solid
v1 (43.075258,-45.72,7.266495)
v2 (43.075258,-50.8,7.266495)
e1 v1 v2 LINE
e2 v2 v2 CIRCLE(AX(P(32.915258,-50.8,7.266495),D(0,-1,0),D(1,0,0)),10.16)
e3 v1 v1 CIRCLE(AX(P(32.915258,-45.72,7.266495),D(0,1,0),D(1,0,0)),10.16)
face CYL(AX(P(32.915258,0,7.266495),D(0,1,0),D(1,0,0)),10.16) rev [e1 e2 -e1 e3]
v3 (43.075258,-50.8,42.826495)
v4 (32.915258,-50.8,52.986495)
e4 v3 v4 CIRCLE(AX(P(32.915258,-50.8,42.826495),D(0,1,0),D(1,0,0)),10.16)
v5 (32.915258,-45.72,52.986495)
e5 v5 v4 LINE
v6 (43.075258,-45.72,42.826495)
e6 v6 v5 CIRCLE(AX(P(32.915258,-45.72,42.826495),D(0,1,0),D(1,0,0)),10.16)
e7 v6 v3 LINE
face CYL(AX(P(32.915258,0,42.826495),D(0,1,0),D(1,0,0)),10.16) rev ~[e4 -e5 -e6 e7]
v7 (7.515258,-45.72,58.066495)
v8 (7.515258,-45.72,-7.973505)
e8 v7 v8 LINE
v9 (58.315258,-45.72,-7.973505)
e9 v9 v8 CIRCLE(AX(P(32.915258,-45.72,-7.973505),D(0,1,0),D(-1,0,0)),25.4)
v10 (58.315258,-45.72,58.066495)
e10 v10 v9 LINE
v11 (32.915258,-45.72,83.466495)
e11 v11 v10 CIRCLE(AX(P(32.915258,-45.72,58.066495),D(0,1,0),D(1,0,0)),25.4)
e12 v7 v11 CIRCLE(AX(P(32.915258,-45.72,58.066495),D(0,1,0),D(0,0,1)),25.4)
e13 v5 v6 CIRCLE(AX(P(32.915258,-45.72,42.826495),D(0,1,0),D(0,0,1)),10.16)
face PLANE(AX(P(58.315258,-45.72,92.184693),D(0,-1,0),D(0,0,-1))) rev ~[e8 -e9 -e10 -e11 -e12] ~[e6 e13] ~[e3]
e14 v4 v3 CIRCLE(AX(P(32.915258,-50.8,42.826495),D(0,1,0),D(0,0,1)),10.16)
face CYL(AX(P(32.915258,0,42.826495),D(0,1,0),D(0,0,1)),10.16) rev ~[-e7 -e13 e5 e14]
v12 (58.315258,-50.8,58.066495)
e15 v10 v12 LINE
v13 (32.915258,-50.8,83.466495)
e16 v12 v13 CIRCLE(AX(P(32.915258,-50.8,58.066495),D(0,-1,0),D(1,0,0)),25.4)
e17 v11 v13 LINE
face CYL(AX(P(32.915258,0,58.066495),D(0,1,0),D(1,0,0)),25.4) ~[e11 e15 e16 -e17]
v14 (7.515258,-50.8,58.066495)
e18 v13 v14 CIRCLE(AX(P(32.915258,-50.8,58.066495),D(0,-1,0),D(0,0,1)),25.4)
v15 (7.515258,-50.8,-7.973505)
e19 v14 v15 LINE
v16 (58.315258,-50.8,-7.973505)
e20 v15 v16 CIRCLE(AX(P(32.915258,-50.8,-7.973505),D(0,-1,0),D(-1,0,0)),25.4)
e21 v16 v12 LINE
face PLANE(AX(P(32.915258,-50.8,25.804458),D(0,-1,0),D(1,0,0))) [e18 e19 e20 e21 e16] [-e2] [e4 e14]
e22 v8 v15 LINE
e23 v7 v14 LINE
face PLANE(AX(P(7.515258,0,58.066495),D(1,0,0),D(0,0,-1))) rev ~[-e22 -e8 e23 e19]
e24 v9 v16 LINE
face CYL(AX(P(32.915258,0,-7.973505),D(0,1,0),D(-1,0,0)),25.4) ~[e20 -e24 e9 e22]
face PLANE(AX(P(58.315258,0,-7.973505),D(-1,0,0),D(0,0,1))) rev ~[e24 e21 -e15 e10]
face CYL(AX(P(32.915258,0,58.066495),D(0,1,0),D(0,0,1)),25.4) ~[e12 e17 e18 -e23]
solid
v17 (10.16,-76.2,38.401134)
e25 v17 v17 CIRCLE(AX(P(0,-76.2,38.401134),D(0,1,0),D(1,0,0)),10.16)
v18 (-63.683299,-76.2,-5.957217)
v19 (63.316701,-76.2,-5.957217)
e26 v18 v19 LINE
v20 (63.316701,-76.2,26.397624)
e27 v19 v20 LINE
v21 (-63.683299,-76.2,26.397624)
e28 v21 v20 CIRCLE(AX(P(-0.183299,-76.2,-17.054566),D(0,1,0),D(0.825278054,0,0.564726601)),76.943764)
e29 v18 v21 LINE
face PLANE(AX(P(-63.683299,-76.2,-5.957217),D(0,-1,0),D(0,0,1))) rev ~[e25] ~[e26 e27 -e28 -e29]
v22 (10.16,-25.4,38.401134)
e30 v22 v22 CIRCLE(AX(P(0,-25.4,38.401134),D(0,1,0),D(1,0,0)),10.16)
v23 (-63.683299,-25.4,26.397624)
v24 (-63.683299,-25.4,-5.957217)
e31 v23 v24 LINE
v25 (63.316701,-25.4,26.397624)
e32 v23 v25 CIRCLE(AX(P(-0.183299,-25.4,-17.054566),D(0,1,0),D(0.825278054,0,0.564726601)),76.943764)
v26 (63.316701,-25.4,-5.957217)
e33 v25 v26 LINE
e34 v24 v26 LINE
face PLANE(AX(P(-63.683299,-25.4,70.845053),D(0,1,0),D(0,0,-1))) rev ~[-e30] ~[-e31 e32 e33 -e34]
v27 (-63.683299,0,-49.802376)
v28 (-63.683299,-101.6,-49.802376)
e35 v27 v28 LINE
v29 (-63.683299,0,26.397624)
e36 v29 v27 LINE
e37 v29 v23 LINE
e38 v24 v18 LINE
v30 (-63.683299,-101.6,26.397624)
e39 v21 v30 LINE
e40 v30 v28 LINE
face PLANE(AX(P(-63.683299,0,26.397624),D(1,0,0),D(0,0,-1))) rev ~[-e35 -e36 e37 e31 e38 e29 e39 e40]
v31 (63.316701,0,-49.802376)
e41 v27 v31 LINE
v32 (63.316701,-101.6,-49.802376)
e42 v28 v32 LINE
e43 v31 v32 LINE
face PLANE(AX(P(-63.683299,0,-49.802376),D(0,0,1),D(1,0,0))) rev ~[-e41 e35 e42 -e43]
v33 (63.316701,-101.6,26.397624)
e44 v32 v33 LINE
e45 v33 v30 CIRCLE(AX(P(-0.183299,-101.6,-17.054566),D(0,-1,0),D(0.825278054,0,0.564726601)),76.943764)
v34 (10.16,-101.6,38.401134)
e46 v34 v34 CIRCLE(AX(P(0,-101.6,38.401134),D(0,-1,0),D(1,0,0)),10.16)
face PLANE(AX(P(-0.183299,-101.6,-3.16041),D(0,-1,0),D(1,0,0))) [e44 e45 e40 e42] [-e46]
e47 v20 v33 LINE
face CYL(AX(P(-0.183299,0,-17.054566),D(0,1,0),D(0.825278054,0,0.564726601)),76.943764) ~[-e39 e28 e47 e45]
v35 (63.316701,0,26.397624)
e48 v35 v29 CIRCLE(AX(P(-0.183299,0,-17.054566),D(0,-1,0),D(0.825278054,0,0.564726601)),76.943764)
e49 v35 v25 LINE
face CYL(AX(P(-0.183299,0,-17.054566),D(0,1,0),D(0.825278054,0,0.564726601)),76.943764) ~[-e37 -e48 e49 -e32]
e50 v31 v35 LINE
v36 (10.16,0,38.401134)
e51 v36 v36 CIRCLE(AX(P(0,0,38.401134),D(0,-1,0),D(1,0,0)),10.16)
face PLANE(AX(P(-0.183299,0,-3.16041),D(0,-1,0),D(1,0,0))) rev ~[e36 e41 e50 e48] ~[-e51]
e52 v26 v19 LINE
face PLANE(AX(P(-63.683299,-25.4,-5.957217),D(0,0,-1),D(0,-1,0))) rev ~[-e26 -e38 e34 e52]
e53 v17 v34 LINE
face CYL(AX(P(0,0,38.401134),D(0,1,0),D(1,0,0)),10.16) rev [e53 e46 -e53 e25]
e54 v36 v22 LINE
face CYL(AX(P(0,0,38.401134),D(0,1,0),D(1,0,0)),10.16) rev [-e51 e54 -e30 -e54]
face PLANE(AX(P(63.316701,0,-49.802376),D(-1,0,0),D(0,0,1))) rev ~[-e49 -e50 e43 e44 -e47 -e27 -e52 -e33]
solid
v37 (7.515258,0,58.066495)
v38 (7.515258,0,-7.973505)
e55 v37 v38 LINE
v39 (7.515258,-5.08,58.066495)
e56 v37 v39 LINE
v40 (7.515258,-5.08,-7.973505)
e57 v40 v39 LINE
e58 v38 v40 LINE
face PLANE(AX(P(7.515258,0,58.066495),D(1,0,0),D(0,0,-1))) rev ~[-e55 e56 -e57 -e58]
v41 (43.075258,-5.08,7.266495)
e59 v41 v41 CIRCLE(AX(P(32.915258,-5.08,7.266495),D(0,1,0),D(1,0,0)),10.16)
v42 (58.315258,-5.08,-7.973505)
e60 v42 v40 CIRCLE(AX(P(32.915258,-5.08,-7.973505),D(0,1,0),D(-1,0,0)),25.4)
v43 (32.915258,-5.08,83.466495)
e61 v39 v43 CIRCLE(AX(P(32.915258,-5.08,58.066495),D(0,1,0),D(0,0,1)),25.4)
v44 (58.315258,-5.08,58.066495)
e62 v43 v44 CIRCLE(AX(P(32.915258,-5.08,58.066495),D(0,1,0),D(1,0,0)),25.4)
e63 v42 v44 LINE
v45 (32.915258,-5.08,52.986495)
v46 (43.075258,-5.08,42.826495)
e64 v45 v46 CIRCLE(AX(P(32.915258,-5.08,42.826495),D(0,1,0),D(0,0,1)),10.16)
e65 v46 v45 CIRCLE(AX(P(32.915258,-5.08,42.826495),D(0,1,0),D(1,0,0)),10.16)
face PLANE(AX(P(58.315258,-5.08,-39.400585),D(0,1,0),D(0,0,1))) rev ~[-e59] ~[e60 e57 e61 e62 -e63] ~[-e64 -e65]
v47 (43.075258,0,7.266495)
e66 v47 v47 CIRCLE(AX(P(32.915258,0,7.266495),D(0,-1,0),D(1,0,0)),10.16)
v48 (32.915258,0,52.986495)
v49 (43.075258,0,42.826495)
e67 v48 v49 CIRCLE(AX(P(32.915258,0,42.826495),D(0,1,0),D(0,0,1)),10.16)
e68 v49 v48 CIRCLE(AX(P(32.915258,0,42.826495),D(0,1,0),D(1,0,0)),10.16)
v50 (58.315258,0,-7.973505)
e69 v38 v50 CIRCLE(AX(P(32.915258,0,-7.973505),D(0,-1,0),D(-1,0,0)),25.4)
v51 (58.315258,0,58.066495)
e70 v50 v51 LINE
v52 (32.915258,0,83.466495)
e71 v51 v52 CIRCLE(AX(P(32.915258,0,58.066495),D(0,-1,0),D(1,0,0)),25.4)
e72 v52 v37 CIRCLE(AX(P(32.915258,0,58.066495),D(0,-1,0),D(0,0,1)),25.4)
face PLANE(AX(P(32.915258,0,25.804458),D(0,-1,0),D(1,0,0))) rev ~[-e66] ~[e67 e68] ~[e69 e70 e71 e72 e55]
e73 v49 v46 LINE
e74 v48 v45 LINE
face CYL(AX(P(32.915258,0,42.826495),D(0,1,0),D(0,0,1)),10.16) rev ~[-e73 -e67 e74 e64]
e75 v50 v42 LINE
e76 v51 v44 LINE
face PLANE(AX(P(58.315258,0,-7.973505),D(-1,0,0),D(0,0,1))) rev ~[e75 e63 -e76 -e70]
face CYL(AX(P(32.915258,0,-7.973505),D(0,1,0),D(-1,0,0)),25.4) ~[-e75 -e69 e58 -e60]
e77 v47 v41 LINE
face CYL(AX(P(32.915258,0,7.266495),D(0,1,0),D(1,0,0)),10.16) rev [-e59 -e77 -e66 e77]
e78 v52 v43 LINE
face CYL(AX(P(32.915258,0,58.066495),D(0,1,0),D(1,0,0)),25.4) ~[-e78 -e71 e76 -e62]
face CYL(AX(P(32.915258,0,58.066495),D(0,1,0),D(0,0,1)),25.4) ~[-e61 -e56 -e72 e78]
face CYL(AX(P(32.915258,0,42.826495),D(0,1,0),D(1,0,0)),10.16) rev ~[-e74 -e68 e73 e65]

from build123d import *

# Parameters (mm, degrees)
F0_R     = 10.16
F1_DEPTH = 101.6
F2_W     = 50.8
F2_H     = 32.354841419
F2_H_2   = 44.4474281366
F3_DEPTH = 254
F4_R     = 10.16
F5_DEPTH = 50.8
F6_W     = 40.64
F6_H     = 34.1181978053
F6_H_2   = 66.04
F6_H_3   = 31.4270798117
F7_DEPTH = 76.2


with BuildPart() as f1:
    # F0 (on Front) → F1 (new body)
    with BuildSketch(Plane.XZ):
        with BuildLine():
            Line((-63.6832991838, 26.3976244633), (-63.6832991838, -49.8023755367))
            Line((-63.6832991838, -49.8023755367), (63.3167008162, -49.8023755367))
            Line((63.3167008162, -49.8023755367), (63.3167008162, 26.3976244633))
            ThreePointArc((63.3167008162, 26.3976244633), (-0.1832991838, 59.8891982699), (-63.6832991838, 26.3976244633))
        make_face()
        with Locations((0, 38.4011343122)):
            Circle(F0_R, mode=Mode.SUBTRACT)
    extrude(amount=F1_DEPTH)

    # F2 (on face) → F3 (cut)
    with BuildSketch(Plane(origin=(-63.6832991838, 0, 0), x_dir=(0, -1, 0), z_dir=(-1, 0, 0))):
        with Locations((50.8, 10.2202037538)):
            Rectangle(F2_W, F2_H)
        with Locations((50.8, 48.6213385316)):
            Rectangle(F2_W, F2_H_2)
    extrude(amount=-F3_DEPTH, mode=Mode.SUBTRACT)


with BuildPart() as f5:
    # F4 (on Front) → F5 (new body)
    with BuildSketch(Plane.XZ):
        with BuildLine():
            ThreePointArc((58.3152576901, 58.0664948159), (50.8757699322, 76.0270070581), (32.9152576901, 83.4664948159))
            ThreePointArc((32.9152576901, 83.4664948159), (14.954745448, 76.0270070581), (7.5152576901, 58.0664948159))
            Line((7.5152576901, 58.0664948159), (7.5152576901, 42.8264948159))
            Line((7.5152576901, 42.8264948159), (7.5152576901, -7.9735051841))
            ThreePointArc((7.5152576901, -7.9735051841), (32.9152576901, -33.3735051841), (58.3152576901, -7.9735051841))
            Line((58.3152576901, -7.9735051841), (58.3152576901, 42.8264948159))
            Line((58.3152576901, 42.8264948159), (58.3152576901, 58.0664948159))
        make_face()
        with Locations((32.9152576901, 7.2664948159)):
            Circle(F4_R, mode=Mode.SUBTRACT)
        with BuildLine():
            ThreePointArc((32.9152576901, 52.9864948159), (40.099462587, 50.0106997128), (43.0752576901, 42.8264948159))
            ThreePointArc((43.0752576901, 42.8264948159), (25.7310527932, 35.6422899191), (32.9152576901, 52.9864948159))
        make_face(mode=Mode.SUBTRACT)
    extrude(amount=F5_DEPTH)

    # F6 (on face) → F7 (cut)
    with BuildSketch(Plane.YZ.offset(58.3152576901)):
        with Locations((-25.4, 75.1255937186)):
            Rectangle(F6_W, F6_H)
        with Locations((-25.4, 25.0464948159)):
            Rectangle(F6_W, F6_H_2)
        with Locations((-25.4, -23.6870450899)):
            Rectangle(F6_W, F6_H_3)
    extrude(amount=-F7_DEPTH, mode=Mode.SUBTRACT)


solid = Compound([f1.part, f5.part])
